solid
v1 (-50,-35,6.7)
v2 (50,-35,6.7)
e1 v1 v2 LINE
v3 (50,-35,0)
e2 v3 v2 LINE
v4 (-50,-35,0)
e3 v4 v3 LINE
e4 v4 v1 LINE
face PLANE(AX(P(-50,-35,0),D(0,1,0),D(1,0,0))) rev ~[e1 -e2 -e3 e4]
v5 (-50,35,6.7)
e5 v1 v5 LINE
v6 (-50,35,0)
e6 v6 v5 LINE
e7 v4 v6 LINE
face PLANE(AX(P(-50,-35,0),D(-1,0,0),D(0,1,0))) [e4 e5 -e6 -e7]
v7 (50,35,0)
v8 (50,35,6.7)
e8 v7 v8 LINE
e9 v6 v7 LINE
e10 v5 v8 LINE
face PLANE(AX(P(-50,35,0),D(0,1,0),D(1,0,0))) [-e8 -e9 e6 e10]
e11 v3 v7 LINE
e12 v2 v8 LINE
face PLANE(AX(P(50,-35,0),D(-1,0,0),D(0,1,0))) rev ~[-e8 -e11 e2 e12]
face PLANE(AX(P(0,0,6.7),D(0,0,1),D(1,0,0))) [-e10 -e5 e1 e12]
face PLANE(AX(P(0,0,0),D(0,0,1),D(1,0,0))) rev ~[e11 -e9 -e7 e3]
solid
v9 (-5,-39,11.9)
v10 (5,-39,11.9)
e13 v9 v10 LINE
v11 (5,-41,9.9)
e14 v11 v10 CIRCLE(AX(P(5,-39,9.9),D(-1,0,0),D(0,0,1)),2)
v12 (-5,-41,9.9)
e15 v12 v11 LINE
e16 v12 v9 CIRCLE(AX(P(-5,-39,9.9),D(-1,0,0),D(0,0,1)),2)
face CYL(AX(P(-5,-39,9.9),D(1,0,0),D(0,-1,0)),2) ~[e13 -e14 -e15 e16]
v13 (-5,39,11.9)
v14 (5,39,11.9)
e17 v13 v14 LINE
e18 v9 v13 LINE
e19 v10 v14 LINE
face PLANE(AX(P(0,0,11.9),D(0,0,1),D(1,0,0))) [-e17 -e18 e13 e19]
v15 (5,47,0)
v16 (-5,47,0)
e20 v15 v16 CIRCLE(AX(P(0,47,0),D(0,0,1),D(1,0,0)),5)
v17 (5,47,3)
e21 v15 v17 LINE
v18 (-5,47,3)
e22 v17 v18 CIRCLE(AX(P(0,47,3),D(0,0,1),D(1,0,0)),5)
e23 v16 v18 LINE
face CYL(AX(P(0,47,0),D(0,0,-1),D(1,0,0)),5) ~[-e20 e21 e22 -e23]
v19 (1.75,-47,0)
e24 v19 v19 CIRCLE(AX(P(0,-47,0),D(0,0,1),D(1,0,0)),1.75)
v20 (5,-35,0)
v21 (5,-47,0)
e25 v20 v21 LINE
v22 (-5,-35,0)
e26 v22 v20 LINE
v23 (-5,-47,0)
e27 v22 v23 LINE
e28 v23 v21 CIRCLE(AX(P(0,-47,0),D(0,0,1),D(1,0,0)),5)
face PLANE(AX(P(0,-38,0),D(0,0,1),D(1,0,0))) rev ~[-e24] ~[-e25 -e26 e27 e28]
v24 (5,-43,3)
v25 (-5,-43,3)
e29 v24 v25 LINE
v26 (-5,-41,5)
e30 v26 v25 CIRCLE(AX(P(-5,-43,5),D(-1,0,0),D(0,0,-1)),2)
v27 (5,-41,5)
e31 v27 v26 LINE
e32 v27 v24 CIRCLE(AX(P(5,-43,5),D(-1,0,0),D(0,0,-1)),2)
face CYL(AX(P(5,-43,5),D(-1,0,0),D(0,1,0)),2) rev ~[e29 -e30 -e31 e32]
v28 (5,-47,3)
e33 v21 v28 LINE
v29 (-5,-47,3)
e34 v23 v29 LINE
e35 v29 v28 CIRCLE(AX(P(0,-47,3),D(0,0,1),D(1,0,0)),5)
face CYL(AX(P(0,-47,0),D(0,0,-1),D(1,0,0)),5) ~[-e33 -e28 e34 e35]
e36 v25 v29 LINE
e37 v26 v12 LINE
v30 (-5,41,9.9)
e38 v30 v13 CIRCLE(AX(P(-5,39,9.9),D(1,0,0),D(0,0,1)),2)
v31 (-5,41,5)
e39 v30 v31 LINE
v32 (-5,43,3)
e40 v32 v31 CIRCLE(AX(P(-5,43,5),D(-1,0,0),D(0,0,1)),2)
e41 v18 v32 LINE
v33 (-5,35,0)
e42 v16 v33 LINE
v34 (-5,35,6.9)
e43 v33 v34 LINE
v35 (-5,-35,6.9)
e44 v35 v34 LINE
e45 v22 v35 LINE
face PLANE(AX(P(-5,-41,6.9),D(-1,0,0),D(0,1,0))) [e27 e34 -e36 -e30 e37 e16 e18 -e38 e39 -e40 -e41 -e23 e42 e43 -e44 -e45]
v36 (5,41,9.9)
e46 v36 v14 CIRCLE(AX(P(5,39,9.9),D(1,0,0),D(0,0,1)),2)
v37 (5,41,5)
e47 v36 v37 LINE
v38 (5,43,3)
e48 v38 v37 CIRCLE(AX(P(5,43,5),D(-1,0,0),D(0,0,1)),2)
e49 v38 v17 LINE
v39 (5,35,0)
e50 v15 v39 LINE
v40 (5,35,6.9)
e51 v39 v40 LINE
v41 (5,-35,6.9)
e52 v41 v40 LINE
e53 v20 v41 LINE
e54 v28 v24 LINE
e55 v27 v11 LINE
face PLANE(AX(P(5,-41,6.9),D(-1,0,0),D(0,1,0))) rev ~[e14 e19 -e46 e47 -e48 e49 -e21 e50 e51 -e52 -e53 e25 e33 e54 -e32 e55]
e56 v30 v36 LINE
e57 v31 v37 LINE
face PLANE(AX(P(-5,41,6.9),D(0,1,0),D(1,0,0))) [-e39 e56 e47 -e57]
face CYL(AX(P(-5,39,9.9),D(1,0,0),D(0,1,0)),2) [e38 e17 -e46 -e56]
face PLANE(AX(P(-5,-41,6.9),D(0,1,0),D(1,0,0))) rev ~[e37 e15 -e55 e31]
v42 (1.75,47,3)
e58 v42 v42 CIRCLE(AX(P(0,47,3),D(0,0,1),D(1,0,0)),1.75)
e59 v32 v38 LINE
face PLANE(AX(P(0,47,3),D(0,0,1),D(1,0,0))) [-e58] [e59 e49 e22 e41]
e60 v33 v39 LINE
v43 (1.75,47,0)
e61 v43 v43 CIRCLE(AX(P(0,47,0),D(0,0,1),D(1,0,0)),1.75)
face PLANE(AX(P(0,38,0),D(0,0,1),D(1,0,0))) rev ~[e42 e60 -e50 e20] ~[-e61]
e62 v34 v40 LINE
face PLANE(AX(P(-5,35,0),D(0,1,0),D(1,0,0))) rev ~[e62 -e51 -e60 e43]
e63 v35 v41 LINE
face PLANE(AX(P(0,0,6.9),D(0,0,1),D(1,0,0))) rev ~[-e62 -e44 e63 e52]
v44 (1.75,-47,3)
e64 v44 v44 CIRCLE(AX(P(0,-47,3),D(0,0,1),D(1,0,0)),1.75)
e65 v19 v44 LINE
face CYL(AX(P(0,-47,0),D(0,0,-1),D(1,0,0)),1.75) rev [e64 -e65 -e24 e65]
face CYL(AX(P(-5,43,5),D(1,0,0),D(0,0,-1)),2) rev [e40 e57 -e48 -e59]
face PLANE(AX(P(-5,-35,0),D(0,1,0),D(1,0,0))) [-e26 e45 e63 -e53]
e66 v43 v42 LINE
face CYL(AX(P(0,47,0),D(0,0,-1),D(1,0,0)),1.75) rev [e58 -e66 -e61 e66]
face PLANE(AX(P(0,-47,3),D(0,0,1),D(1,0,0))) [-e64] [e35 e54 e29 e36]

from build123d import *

# Parameters (mm, degrees)
F0_W     = 100
F0_H     = 70
F1_DEPTH = 6.7
F2_R     = 1.75
F3_DEPTH = 3
F2_W     = 10
F2_H     = 6
F4_DEPTH = 6.9
F5_W     = 10
F5_H     = 82
F6_DEPTH = 5
F7_R     = 2


with BuildPart() as f1:
    # F0 (on Top) → F1 (new body)
    with BuildSketch(Plane.XY):
        Rectangle(F0_W, F0_H)
    extrude(amount=F1_DEPTH)


with BuildPart() as f3:
    # F2 (on Top) → F3 (new body)
    with BuildSketch(Plane.XY):
        with BuildLine():
            ThreePointArc((-5, 47), (0, 42), (5, 47))
            ThreePointArc((5, 47), (0, 52), (-5, 47))
        make_face()
        with Locations((0, 47)):
            Circle(F2_R, mode=Mode.SUBTRACT)
        with BuildLine():
            Line((5, 41), (5, 47))
            ThreePointArc((5, 47), (0, 42), (-5, 47))
            Line((-5, 47), (-5, 41))
            Line((-5, 41), (5, 41))
        make_face()
    extrude(amount=F3_DEPTH)

    # F2 (on Top) → F4 (join)
    with BuildSketch(Plane.XY):
        with Locations((0, 38)):
            Rectangle(F2_W, F2_H)
    extrude(amount=F4_DEPTH)



with BuildPart() as f3b:
    # F2 (on Top) → F3, piece 2 (new body)
    with BuildSketch(Plane.XY):
        with BuildLine():
            ThreePointArc((-5, -47), (0, -52), (5, -47))
            ThreePointArc((5, -47), (0, -42), (-5, -47))
        make_face()
        with Locations((0, -47)):
            Circle(F2_R, mode=Mode.SUBTRACT)
        with BuildLine():
            ThreePointArc((-5, -47), (0, -42), (5, -47))
            Line((5, -47), (5, -41))
            Line((5, -41), (-5, -41))
            Line((-5, -41), (-5, -47))
        make_face()
    extrude(amount=F3_DEPTH)

    # F2 (on Top) → F4, piece 2 (join)
    with BuildSketch(Plane.XY):
        with Locations((0, -38)):
            Rectangle(F2_W, F2_H)
    extrude(amount=F4_DEPTH)


with BuildPart() as f3_1:
    add(f3.part)

    add(f3b.part)  # F6 merges F3b
    # F5 (on face) → F6 (join)
    with BuildSketch(Plane.XY.offset(6.9)):
        Rectangle(F5_W, F5_H)
    extrude(amount=F6_DEPTH)

    # F7
    f7_edges = [f3_1.edges().sort_by_distance(p)[0] for p in [
        (0, 41, 11.9),
        (0, -41, 11.9),
        (0, -41, 3),
        (0, 41, 3),
    ]]
    fillet(f7_edges, radius=F7_R)


solid = Compound([f1.part, f3_1.part])
